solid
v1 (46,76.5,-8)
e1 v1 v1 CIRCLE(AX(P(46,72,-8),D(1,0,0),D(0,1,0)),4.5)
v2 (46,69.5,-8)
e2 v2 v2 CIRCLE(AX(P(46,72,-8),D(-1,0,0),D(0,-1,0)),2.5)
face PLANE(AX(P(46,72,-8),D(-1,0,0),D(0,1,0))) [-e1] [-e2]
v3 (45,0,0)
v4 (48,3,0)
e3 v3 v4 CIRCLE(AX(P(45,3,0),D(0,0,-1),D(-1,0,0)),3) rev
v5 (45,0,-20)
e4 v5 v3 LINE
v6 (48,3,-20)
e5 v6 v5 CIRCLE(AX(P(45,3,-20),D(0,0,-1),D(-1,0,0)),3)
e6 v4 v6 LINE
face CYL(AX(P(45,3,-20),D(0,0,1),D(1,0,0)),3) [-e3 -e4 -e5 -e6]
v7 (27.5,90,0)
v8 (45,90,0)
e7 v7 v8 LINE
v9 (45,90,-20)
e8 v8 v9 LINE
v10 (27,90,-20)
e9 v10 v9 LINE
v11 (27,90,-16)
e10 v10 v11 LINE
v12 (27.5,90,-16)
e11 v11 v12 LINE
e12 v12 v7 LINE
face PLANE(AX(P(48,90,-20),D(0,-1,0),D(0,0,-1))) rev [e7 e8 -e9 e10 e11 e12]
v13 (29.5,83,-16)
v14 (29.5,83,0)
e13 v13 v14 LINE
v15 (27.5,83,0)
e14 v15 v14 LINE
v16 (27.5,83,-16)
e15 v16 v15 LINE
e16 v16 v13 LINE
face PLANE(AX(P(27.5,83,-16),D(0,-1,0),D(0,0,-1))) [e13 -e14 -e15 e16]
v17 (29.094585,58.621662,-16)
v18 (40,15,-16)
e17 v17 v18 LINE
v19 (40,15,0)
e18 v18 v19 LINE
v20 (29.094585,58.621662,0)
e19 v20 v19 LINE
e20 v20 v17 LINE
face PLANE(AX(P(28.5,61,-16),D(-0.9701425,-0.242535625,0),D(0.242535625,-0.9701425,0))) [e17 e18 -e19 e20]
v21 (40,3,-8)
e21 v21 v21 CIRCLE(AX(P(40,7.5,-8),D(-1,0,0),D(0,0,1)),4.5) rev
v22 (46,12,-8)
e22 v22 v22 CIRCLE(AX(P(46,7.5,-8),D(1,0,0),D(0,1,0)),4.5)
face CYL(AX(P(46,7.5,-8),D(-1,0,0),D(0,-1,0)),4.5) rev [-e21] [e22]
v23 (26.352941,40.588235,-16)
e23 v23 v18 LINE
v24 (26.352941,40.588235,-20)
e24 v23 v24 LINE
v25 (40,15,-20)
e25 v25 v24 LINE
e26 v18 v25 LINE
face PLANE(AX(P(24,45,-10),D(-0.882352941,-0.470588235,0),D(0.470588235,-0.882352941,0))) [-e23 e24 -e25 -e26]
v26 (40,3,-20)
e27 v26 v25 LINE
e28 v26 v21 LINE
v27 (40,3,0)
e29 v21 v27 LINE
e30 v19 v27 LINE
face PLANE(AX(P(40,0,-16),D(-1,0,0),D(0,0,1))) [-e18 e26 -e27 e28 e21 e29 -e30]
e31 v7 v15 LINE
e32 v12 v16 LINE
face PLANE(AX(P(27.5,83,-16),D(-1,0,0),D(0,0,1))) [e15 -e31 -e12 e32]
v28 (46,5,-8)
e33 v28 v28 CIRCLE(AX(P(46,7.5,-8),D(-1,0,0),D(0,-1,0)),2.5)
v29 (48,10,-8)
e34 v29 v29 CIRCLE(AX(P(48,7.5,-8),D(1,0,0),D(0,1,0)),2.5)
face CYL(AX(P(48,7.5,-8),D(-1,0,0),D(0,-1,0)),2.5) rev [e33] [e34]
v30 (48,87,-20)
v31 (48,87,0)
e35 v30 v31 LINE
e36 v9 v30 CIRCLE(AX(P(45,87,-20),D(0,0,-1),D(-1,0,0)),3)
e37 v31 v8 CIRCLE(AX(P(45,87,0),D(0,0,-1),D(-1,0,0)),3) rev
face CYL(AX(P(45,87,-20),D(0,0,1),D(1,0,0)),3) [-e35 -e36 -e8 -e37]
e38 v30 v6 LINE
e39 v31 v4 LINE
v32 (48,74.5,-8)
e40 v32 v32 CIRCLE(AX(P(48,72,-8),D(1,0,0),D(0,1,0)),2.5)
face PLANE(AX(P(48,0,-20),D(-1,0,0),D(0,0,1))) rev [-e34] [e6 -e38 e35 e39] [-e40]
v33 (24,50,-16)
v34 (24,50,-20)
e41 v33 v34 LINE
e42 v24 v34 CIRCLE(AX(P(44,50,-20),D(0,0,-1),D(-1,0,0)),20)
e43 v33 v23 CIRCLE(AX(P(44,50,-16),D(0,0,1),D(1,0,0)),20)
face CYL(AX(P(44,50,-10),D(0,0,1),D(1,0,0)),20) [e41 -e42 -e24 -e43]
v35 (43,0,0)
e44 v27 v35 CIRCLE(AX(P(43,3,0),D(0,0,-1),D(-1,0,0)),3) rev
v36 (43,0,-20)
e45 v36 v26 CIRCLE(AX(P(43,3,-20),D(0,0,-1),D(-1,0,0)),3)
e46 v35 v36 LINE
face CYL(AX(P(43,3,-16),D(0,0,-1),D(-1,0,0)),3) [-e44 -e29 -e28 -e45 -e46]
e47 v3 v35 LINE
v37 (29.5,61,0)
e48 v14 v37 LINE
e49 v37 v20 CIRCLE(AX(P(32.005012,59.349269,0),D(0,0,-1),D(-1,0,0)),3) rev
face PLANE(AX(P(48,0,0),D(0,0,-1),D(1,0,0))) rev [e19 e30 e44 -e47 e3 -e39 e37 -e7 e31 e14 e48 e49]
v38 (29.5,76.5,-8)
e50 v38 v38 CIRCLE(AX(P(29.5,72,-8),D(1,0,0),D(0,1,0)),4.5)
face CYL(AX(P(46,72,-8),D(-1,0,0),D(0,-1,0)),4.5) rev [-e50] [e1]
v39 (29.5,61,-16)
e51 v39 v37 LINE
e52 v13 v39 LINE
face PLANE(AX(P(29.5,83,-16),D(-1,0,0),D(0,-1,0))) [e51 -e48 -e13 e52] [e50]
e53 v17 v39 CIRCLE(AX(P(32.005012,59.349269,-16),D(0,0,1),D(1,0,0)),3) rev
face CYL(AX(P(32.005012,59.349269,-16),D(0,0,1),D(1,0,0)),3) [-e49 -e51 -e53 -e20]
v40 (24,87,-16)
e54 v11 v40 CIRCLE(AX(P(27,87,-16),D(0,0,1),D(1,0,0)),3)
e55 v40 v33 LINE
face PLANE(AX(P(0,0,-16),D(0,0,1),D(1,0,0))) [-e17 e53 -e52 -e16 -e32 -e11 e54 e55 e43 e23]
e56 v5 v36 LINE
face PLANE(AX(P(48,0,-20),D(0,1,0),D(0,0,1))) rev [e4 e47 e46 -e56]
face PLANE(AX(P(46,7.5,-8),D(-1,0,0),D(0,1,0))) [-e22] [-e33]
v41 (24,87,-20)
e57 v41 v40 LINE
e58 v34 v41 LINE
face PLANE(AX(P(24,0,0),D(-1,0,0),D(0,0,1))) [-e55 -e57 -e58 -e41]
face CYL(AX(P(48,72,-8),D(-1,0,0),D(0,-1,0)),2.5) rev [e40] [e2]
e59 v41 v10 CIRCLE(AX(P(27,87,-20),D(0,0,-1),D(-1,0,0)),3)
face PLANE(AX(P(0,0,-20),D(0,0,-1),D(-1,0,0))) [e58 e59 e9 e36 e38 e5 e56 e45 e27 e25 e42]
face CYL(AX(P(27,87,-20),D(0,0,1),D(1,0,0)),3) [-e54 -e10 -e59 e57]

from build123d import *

# Parameters (mm, degrees)
SKETCH1_W            = 24
SKETCH1_H            = 90
BOSS_EXTRUDE1_DEPTH  = 20
CUT_EXTRUDE1_DEPTH   = 16
CUT_EXTRUDE8_DEPTH   = 10
SKETCH11_R           = 2.5
CUT_EXTRUDE9_DEPTH   = 18.5
SKETCH12_R           = 4.5
CUT_EXTRUDE10_DEPTH  = 16.5
FILLET1_R            = 20
FILLET2_R            = 3
FILLET1_OF_MIRROR1_R = 20
FILLET2_OF_MIRROR1_R = 3
SKETCH13_W           = 28.58864277
SKETCH13_H           = 106.823904202
CUT_EXTRUDE11_DEPTH  = 24


with BuildPart() as part:
    # Sketch1 → Boss-Extrude1 (new body)
    with BuildSketch(Plane.XY):
        with Locations((12, 45)):
            Rectangle(SKETCH1_W, SKETCH1_H)
    boss_extrude1 = extrude(amount=-BOSS_EXTRUDE1_DEPTH)

    # Sketch4 → Cut-Extrude1 (cut)
    with BuildSketch(Plane.XY):
        Polygon((20.5, 83), (18.5, 83), (18.5, 61), (19.5, 61), (8, 15), (8, 0), (24, 0), (24, 90), (20.5, 90), align=None)
    cut_extrude1 = extrude(amount=-CUT_EXTRUDE1_DEPTH, mode=Mode.SUBTRACT)

    # Sketch9 → Cut-Extrude8 (cut)
    with BuildSketch(Plane(origin=(0, 0, -20), x_dir=(-1, 0, 0), z_dir=(0, 0, -1))):
        Polygon((-24, 0), (-24, 45), (-8, 15), (-8, 0), align=None)
    cut_extrude8 = extrude(amount=-CUT_EXTRUDE8_DEPTH, mode=Mode.SUBTRACT)

    # Sketch11 → Cut-Extrude9 (cut)
    with BuildSketch(Plane(origin=(18.5, 0, 0), x_dir=(0, 0, -1), z_dir=(1, 0, 0))):
        with Locations(Location((8, 72, 0), (0, 0, 90))):
            Circle(SKETCH11_R)
        with Locations(Location((8, 7.5, 0), (0, 0, 90))):
            Circle(SKETCH11_R)
    cut_extrude9 = extrude(amount=-CUT_EXTRUDE9_DEPTH, mode=Mode.SUBTRACT)

    # Sketch12 → Cut-Extrude10 (cut)
    with BuildSketch(Plane(origin=(18.5, 0, 0), x_dir=(0, 0, -1), z_dir=(1, 0, 0))):
        with Locations(Location((8, 72, 0), (0, 0, 90))):
            Circle(SKETCH12_R)
        with Locations(Location((8, 7.5, 0), (0, 0, 90))):
            Circle(SKETCH12_R)
    cut_extrude10 = extrude(amount=-CUT_EXTRUDE10_DEPTH, mode=Mode.SUBTRACT)

    # Fillet1
    fillet1_edges = [part.edges().sort_by_distance(p)[0] for p in [
        (24, 45, -18),
    ]]
    fillet(fillet1_edges, radius=FILLET1_R)

    # Fillet2
    # the kernel refuses this fillet: 3 mm, written as the material it takes off along each edge
    with BuildSketch(Plane(origin=(0, 90, 7.5), x_dir=(1, 0, 0), z_dir=(0, 0, -1)), Plane(origin=(0, 0, 7.5), x_dir=(0, 1, 0), z_dir=(0, 0, -1)), Plane(origin=(8, 0, -27.5), x_dir=(0, 1, 0), z_dir=(0, 0, 1))) as fillet2_piece_1:
        with BuildLine():
            CenterArc((FILLET2_R, FILLET2_R), FILLET2_R, 180, 90)
            Line((0, FILLET2_R), (-FILLET2_R * 0.02, FILLET2_R))
            Line((-FILLET2_R * 0.02, FILLET2_R), (-FILLET2_R * 0.02, -FILLET2_R * 0.02))
            Line((-FILLET2_R * 0.02, -FILLET2_R * 0.02), (FILLET2_R, -FILLET2_R * 0.02))
            Line((FILLET2_R, -FILLET2_R * 0.02), (FILLET2_R, 0))
        make_face()
    extrude(amount=35, mode=Mode.SUBTRACT)
    with BuildSketch(Plane(origin=(24, 90, -8.5), x_dir=(0, -1, 0), z_dir=(0, 0, -1))) as fillet2_piece_2:
        with BuildLine():
            CenterArc((FILLET2_R, FILLET2_R), FILLET2_R, 180, 90)
            Line((0, FILLET2_R), (-FILLET2_R * 0.02, FILLET2_R))
            Line((-FILLET2_R * 0.02, FILLET2_R), (-FILLET2_R * 0.02, -FILLET2_R * 0.02))
            Line((-FILLET2_R * 0.02, -FILLET2_R * 0.02), (FILLET2_R, -FILLET2_R * 0.02))
            Line((FILLET2_R, -FILLET2_R * 0.02), (FILLET2_R, 0))
        make_face()
    extrude(amount=19, mode=Mode.SUBTRACT)
    with BuildSketch(Plane(origin=(19.5, 61, 6.128837665), x_dir=(-0.24253562503633366, -0.9701425001453317, 0), z_dir=(0, 0, -1))) as fillet2_piece_3:
        with BuildLine():
            CenterArc((2.451535066, 3), FILLET2_R, 222.580014358, 47.419985642)
            Line((0.242535625, 0.9701425), (0.198355636, 0.92954535))
            ThreePointArc((0.198355636, 0.92954535), (0.063059263, 0.499623388), (-0.05820855, 0.014552138))
            Line((-0.05820855, 0.014552138), (0, -0.06))
            Line((0, -0.06), (2.451535066, -0.06))
            Line((2.451535066, -0.06), (2.451535066, 0))
        make_face()
    extrude(amount=22.128837665, mode=Mode.SUBTRACT)


with BuildPart() as mirror1_1:
    # Mirror1: Boss-Extrude1 across plane
    add(boss_extrude1.mirror(Plane(origin=(24, 0, -20), x_dir=(0, 0, 1), z_dir=(1, 0, 0))))

    # Mirror1 2: Cut-Extrude1, Cut-Extrude8, Cut-Extrude9, Cut-Extrude10 across plane
    add(cut_extrude1.mirror(Plane(origin=(24, 0, -20), x_dir=(0, 0, 1), z_dir=(1, 0, 0))), mode=Mode.SUBTRACT)
    add(cut_extrude8.mirror(Plane(origin=(24, 0, -20), x_dir=(0, 0, 1), z_dir=(1, 0, 0))), mode=Mode.SUBTRACT)
    add(cut_extrude9.mirror(Plane(origin=(24, 0, -20), x_dir=(0, 0, 1), z_dir=(1, 0, 0))), mode=Mode.SUBTRACT)
    add(cut_extrude10.mirror(Plane(origin=(24, 0, -20), x_dir=(0, 0, 1), z_dir=(1, 0, 0))), mode=Mode.SUBTRACT)

    # Fillet1 of Mirror1
    fillet1_of_mirror1_edges = [mirror1_1.edges().sort_by_distance(p)[0] for p in [
        (24, 45, -18),
    ]]
    fillet(fillet1_of_mirror1_edges, radius=FILLET1_OF_MIRROR1_R)

    # Fillet2 of Mirror1
    # the kernel refuses this fillet: 3 mm, written as the material it takes off along each edge
    with BuildSketch(Plane(origin=(48, 90, 7.5), x_dir=(-1, 0, 0), z_dir=(0, 0, -1)), Plane(origin=(48, 0, 7.5), x_dir=(0, 1, 0), z_dir=(0, 0, -1))) as fillet2_of_mirror1_piece_1:
        with BuildLine():
            CenterArc((FILLET2_OF_MIRROR1_R, -FILLET2_OF_MIRROR1_R), FILLET2_OF_MIRROR1_R, 90, 90)
            Line((0, -FILLET2_OF_MIRROR1_R), (-FILLET2_OF_MIRROR1_R * 0.02, -FILLET2_OF_MIRROR1_R))
            Line((-FILLET2_OF_MIRROR1_R * 0.02, -FILLET2_OF_MIRROR1_R), (-FILLET2_OF_MIRROR1_R * 0.02, FILLET2_OF_MIRROR1_R * 0.02))
            Line((-FILLET2_OF_MIRROR1_R * 0.02, FILLET2_OF_MIRROR1_R * 0.02), (FILLET2_OF_MIRROR1_R, FILLET2_OF_MIRROR1_R * 0.02))
            Line((FILLET2_OF_MIRROR1_R, FILLET2_OF_MIRROR1_R * 0.02), (FILLET2_OF_MIRROR1_R, 0))
        make_face()
    extrude(amount=35, mode=Mode.SUBTRACT)
    with BuildSketch(Plane(origin=(24, 90, -8.5), x_dir=(0, -1, 0), z_dir=(0, 0, -1))) as fillet2_of_mirror1_piece_2:
        with BuildLine():
            CenterArc((FILLET2_OF_MIRROR1_R, -FILLET2_OF_MIRROR1_R), FILLET2_OF_MIRROR1_R, 90, 90)
            Line((0, -FILLET2_OF_MIRROR1_R), (-FILLET2_OF_MIRROR1_R * 0.02, -FILLET2_OF_MIRROR1_R))
            Line((-FILLET2_OF_MIRROR1_R * 0.02, -FILLET2_OF_MIRROR1_R), (-FILLET2_OF_MIRROR1_R * 0.02, FILLET2_OF_MIRROR1_R * 0.02))
            Line((-FILLET2_OF_MIRROR1_R * 0.02, FILLET2_OF_MIRROR1_R * 0.02), (FILLET2_OF_MIRROR1_R, FILLET2_OF_MIRROR1_R * 0.02))
            Line((FILLET2_OF_MIRROR1_R, FILLET2_OF_MIRROR1_R * 0.02), (FILLET2_OF_MIRROR1_R, 0))
        make_face()
    extrude(amount=19, mode=Mode.SUBTRACT)
    with BuildSketch(Plane(origin=(40, 0, 7.5), x_dir=(0, 1, 0), z_dir=(0, 0, -1))) as fillet2_of_mirror1_piece_3:
        with BuildLine():
            CenterArc((FILLET2_OF_MIRROR1_R, FILLET2_OF_MIRROR1_R), FILLET2_OF_MIRROR1_R, 180, 90)
            Line((0, FILLET2_OF_MIRROR1_R), (-FILLET2_OF_MIRROR1_R * 0.02, FILLET2_OF_MIRROR1_R))
            Line((-FILLET2_OF_MIRROR1_R * 0.02, FILLET2_OF_MIRROR1_R), (-FILLET2_OF_MIRROR1_R * 0.02, -FILLET2_OF_MIRROR1_R * 0.02))
            Line((-FILLET2_OF_MIRROR1_R * 0.02, -FILLET2_OF_MIRROR1_R * 0.02), (FILLET2_OF_MIRROR1_R, -FILLET2_OF_MIRROR1_R * 0.02))
            Line((FILLET2_OF_MIRROR1_R, -FILLET2_OF_MIRROR1_R * 0.02), (FILLET2_OF_MIRROR1_R, 0))
        make_face()
    extrude(amount=35, mode=Mode.SUBTRACT)
    with BuildSketch(Plane(origin=(28.5, 61, 6.128837665), x_dir=(0.24253562503633366, -0.9701425001453317, 0), z_dir=(0, 0, -1))) as fillet2_of_mirror1_piece_4:
        with BuildLine():
            CenterArc((2.451535066, -3), FILLET2_OF_MIRROR1_R, 90, 47.419985642)
            Line((0.242535625, -0.9701425), (0.198355636, -0.92954535))
            ThreePointArc((0.198355636, -0.92954535), (0.063059263, -0.499623388), (-0.05820855, -0.014552138))
            Line((-0.05820855, -0.014552138), (0, 0.06))
            Line((0, 0.06), (2.451535066, 0.06))
            Line((2.451535066, 0.06), (2.451535066, 0))
        make_face()
    extrude(amount=22.128837665, mode=Mode.SUBTRACT)


with BuildPart() as part_1:
    add(part.part)

    # Mirror1 united with what the copies touc: union Mirror1_1
    add(mirror1_1.part)

    # Sketch13 → Cut-Extrude11 (cut)
    with BuildSketch(Plane.ZY):
        with Locations((-8.954074045, 49.790814809)):
            Rectangle(SKETCH13_W, SKETCH13_H)
    extrude(amount=-CUT_EXTRUDE11_DEPTH, mode=Mode.SUBTRACT)


solid = part_1.part
